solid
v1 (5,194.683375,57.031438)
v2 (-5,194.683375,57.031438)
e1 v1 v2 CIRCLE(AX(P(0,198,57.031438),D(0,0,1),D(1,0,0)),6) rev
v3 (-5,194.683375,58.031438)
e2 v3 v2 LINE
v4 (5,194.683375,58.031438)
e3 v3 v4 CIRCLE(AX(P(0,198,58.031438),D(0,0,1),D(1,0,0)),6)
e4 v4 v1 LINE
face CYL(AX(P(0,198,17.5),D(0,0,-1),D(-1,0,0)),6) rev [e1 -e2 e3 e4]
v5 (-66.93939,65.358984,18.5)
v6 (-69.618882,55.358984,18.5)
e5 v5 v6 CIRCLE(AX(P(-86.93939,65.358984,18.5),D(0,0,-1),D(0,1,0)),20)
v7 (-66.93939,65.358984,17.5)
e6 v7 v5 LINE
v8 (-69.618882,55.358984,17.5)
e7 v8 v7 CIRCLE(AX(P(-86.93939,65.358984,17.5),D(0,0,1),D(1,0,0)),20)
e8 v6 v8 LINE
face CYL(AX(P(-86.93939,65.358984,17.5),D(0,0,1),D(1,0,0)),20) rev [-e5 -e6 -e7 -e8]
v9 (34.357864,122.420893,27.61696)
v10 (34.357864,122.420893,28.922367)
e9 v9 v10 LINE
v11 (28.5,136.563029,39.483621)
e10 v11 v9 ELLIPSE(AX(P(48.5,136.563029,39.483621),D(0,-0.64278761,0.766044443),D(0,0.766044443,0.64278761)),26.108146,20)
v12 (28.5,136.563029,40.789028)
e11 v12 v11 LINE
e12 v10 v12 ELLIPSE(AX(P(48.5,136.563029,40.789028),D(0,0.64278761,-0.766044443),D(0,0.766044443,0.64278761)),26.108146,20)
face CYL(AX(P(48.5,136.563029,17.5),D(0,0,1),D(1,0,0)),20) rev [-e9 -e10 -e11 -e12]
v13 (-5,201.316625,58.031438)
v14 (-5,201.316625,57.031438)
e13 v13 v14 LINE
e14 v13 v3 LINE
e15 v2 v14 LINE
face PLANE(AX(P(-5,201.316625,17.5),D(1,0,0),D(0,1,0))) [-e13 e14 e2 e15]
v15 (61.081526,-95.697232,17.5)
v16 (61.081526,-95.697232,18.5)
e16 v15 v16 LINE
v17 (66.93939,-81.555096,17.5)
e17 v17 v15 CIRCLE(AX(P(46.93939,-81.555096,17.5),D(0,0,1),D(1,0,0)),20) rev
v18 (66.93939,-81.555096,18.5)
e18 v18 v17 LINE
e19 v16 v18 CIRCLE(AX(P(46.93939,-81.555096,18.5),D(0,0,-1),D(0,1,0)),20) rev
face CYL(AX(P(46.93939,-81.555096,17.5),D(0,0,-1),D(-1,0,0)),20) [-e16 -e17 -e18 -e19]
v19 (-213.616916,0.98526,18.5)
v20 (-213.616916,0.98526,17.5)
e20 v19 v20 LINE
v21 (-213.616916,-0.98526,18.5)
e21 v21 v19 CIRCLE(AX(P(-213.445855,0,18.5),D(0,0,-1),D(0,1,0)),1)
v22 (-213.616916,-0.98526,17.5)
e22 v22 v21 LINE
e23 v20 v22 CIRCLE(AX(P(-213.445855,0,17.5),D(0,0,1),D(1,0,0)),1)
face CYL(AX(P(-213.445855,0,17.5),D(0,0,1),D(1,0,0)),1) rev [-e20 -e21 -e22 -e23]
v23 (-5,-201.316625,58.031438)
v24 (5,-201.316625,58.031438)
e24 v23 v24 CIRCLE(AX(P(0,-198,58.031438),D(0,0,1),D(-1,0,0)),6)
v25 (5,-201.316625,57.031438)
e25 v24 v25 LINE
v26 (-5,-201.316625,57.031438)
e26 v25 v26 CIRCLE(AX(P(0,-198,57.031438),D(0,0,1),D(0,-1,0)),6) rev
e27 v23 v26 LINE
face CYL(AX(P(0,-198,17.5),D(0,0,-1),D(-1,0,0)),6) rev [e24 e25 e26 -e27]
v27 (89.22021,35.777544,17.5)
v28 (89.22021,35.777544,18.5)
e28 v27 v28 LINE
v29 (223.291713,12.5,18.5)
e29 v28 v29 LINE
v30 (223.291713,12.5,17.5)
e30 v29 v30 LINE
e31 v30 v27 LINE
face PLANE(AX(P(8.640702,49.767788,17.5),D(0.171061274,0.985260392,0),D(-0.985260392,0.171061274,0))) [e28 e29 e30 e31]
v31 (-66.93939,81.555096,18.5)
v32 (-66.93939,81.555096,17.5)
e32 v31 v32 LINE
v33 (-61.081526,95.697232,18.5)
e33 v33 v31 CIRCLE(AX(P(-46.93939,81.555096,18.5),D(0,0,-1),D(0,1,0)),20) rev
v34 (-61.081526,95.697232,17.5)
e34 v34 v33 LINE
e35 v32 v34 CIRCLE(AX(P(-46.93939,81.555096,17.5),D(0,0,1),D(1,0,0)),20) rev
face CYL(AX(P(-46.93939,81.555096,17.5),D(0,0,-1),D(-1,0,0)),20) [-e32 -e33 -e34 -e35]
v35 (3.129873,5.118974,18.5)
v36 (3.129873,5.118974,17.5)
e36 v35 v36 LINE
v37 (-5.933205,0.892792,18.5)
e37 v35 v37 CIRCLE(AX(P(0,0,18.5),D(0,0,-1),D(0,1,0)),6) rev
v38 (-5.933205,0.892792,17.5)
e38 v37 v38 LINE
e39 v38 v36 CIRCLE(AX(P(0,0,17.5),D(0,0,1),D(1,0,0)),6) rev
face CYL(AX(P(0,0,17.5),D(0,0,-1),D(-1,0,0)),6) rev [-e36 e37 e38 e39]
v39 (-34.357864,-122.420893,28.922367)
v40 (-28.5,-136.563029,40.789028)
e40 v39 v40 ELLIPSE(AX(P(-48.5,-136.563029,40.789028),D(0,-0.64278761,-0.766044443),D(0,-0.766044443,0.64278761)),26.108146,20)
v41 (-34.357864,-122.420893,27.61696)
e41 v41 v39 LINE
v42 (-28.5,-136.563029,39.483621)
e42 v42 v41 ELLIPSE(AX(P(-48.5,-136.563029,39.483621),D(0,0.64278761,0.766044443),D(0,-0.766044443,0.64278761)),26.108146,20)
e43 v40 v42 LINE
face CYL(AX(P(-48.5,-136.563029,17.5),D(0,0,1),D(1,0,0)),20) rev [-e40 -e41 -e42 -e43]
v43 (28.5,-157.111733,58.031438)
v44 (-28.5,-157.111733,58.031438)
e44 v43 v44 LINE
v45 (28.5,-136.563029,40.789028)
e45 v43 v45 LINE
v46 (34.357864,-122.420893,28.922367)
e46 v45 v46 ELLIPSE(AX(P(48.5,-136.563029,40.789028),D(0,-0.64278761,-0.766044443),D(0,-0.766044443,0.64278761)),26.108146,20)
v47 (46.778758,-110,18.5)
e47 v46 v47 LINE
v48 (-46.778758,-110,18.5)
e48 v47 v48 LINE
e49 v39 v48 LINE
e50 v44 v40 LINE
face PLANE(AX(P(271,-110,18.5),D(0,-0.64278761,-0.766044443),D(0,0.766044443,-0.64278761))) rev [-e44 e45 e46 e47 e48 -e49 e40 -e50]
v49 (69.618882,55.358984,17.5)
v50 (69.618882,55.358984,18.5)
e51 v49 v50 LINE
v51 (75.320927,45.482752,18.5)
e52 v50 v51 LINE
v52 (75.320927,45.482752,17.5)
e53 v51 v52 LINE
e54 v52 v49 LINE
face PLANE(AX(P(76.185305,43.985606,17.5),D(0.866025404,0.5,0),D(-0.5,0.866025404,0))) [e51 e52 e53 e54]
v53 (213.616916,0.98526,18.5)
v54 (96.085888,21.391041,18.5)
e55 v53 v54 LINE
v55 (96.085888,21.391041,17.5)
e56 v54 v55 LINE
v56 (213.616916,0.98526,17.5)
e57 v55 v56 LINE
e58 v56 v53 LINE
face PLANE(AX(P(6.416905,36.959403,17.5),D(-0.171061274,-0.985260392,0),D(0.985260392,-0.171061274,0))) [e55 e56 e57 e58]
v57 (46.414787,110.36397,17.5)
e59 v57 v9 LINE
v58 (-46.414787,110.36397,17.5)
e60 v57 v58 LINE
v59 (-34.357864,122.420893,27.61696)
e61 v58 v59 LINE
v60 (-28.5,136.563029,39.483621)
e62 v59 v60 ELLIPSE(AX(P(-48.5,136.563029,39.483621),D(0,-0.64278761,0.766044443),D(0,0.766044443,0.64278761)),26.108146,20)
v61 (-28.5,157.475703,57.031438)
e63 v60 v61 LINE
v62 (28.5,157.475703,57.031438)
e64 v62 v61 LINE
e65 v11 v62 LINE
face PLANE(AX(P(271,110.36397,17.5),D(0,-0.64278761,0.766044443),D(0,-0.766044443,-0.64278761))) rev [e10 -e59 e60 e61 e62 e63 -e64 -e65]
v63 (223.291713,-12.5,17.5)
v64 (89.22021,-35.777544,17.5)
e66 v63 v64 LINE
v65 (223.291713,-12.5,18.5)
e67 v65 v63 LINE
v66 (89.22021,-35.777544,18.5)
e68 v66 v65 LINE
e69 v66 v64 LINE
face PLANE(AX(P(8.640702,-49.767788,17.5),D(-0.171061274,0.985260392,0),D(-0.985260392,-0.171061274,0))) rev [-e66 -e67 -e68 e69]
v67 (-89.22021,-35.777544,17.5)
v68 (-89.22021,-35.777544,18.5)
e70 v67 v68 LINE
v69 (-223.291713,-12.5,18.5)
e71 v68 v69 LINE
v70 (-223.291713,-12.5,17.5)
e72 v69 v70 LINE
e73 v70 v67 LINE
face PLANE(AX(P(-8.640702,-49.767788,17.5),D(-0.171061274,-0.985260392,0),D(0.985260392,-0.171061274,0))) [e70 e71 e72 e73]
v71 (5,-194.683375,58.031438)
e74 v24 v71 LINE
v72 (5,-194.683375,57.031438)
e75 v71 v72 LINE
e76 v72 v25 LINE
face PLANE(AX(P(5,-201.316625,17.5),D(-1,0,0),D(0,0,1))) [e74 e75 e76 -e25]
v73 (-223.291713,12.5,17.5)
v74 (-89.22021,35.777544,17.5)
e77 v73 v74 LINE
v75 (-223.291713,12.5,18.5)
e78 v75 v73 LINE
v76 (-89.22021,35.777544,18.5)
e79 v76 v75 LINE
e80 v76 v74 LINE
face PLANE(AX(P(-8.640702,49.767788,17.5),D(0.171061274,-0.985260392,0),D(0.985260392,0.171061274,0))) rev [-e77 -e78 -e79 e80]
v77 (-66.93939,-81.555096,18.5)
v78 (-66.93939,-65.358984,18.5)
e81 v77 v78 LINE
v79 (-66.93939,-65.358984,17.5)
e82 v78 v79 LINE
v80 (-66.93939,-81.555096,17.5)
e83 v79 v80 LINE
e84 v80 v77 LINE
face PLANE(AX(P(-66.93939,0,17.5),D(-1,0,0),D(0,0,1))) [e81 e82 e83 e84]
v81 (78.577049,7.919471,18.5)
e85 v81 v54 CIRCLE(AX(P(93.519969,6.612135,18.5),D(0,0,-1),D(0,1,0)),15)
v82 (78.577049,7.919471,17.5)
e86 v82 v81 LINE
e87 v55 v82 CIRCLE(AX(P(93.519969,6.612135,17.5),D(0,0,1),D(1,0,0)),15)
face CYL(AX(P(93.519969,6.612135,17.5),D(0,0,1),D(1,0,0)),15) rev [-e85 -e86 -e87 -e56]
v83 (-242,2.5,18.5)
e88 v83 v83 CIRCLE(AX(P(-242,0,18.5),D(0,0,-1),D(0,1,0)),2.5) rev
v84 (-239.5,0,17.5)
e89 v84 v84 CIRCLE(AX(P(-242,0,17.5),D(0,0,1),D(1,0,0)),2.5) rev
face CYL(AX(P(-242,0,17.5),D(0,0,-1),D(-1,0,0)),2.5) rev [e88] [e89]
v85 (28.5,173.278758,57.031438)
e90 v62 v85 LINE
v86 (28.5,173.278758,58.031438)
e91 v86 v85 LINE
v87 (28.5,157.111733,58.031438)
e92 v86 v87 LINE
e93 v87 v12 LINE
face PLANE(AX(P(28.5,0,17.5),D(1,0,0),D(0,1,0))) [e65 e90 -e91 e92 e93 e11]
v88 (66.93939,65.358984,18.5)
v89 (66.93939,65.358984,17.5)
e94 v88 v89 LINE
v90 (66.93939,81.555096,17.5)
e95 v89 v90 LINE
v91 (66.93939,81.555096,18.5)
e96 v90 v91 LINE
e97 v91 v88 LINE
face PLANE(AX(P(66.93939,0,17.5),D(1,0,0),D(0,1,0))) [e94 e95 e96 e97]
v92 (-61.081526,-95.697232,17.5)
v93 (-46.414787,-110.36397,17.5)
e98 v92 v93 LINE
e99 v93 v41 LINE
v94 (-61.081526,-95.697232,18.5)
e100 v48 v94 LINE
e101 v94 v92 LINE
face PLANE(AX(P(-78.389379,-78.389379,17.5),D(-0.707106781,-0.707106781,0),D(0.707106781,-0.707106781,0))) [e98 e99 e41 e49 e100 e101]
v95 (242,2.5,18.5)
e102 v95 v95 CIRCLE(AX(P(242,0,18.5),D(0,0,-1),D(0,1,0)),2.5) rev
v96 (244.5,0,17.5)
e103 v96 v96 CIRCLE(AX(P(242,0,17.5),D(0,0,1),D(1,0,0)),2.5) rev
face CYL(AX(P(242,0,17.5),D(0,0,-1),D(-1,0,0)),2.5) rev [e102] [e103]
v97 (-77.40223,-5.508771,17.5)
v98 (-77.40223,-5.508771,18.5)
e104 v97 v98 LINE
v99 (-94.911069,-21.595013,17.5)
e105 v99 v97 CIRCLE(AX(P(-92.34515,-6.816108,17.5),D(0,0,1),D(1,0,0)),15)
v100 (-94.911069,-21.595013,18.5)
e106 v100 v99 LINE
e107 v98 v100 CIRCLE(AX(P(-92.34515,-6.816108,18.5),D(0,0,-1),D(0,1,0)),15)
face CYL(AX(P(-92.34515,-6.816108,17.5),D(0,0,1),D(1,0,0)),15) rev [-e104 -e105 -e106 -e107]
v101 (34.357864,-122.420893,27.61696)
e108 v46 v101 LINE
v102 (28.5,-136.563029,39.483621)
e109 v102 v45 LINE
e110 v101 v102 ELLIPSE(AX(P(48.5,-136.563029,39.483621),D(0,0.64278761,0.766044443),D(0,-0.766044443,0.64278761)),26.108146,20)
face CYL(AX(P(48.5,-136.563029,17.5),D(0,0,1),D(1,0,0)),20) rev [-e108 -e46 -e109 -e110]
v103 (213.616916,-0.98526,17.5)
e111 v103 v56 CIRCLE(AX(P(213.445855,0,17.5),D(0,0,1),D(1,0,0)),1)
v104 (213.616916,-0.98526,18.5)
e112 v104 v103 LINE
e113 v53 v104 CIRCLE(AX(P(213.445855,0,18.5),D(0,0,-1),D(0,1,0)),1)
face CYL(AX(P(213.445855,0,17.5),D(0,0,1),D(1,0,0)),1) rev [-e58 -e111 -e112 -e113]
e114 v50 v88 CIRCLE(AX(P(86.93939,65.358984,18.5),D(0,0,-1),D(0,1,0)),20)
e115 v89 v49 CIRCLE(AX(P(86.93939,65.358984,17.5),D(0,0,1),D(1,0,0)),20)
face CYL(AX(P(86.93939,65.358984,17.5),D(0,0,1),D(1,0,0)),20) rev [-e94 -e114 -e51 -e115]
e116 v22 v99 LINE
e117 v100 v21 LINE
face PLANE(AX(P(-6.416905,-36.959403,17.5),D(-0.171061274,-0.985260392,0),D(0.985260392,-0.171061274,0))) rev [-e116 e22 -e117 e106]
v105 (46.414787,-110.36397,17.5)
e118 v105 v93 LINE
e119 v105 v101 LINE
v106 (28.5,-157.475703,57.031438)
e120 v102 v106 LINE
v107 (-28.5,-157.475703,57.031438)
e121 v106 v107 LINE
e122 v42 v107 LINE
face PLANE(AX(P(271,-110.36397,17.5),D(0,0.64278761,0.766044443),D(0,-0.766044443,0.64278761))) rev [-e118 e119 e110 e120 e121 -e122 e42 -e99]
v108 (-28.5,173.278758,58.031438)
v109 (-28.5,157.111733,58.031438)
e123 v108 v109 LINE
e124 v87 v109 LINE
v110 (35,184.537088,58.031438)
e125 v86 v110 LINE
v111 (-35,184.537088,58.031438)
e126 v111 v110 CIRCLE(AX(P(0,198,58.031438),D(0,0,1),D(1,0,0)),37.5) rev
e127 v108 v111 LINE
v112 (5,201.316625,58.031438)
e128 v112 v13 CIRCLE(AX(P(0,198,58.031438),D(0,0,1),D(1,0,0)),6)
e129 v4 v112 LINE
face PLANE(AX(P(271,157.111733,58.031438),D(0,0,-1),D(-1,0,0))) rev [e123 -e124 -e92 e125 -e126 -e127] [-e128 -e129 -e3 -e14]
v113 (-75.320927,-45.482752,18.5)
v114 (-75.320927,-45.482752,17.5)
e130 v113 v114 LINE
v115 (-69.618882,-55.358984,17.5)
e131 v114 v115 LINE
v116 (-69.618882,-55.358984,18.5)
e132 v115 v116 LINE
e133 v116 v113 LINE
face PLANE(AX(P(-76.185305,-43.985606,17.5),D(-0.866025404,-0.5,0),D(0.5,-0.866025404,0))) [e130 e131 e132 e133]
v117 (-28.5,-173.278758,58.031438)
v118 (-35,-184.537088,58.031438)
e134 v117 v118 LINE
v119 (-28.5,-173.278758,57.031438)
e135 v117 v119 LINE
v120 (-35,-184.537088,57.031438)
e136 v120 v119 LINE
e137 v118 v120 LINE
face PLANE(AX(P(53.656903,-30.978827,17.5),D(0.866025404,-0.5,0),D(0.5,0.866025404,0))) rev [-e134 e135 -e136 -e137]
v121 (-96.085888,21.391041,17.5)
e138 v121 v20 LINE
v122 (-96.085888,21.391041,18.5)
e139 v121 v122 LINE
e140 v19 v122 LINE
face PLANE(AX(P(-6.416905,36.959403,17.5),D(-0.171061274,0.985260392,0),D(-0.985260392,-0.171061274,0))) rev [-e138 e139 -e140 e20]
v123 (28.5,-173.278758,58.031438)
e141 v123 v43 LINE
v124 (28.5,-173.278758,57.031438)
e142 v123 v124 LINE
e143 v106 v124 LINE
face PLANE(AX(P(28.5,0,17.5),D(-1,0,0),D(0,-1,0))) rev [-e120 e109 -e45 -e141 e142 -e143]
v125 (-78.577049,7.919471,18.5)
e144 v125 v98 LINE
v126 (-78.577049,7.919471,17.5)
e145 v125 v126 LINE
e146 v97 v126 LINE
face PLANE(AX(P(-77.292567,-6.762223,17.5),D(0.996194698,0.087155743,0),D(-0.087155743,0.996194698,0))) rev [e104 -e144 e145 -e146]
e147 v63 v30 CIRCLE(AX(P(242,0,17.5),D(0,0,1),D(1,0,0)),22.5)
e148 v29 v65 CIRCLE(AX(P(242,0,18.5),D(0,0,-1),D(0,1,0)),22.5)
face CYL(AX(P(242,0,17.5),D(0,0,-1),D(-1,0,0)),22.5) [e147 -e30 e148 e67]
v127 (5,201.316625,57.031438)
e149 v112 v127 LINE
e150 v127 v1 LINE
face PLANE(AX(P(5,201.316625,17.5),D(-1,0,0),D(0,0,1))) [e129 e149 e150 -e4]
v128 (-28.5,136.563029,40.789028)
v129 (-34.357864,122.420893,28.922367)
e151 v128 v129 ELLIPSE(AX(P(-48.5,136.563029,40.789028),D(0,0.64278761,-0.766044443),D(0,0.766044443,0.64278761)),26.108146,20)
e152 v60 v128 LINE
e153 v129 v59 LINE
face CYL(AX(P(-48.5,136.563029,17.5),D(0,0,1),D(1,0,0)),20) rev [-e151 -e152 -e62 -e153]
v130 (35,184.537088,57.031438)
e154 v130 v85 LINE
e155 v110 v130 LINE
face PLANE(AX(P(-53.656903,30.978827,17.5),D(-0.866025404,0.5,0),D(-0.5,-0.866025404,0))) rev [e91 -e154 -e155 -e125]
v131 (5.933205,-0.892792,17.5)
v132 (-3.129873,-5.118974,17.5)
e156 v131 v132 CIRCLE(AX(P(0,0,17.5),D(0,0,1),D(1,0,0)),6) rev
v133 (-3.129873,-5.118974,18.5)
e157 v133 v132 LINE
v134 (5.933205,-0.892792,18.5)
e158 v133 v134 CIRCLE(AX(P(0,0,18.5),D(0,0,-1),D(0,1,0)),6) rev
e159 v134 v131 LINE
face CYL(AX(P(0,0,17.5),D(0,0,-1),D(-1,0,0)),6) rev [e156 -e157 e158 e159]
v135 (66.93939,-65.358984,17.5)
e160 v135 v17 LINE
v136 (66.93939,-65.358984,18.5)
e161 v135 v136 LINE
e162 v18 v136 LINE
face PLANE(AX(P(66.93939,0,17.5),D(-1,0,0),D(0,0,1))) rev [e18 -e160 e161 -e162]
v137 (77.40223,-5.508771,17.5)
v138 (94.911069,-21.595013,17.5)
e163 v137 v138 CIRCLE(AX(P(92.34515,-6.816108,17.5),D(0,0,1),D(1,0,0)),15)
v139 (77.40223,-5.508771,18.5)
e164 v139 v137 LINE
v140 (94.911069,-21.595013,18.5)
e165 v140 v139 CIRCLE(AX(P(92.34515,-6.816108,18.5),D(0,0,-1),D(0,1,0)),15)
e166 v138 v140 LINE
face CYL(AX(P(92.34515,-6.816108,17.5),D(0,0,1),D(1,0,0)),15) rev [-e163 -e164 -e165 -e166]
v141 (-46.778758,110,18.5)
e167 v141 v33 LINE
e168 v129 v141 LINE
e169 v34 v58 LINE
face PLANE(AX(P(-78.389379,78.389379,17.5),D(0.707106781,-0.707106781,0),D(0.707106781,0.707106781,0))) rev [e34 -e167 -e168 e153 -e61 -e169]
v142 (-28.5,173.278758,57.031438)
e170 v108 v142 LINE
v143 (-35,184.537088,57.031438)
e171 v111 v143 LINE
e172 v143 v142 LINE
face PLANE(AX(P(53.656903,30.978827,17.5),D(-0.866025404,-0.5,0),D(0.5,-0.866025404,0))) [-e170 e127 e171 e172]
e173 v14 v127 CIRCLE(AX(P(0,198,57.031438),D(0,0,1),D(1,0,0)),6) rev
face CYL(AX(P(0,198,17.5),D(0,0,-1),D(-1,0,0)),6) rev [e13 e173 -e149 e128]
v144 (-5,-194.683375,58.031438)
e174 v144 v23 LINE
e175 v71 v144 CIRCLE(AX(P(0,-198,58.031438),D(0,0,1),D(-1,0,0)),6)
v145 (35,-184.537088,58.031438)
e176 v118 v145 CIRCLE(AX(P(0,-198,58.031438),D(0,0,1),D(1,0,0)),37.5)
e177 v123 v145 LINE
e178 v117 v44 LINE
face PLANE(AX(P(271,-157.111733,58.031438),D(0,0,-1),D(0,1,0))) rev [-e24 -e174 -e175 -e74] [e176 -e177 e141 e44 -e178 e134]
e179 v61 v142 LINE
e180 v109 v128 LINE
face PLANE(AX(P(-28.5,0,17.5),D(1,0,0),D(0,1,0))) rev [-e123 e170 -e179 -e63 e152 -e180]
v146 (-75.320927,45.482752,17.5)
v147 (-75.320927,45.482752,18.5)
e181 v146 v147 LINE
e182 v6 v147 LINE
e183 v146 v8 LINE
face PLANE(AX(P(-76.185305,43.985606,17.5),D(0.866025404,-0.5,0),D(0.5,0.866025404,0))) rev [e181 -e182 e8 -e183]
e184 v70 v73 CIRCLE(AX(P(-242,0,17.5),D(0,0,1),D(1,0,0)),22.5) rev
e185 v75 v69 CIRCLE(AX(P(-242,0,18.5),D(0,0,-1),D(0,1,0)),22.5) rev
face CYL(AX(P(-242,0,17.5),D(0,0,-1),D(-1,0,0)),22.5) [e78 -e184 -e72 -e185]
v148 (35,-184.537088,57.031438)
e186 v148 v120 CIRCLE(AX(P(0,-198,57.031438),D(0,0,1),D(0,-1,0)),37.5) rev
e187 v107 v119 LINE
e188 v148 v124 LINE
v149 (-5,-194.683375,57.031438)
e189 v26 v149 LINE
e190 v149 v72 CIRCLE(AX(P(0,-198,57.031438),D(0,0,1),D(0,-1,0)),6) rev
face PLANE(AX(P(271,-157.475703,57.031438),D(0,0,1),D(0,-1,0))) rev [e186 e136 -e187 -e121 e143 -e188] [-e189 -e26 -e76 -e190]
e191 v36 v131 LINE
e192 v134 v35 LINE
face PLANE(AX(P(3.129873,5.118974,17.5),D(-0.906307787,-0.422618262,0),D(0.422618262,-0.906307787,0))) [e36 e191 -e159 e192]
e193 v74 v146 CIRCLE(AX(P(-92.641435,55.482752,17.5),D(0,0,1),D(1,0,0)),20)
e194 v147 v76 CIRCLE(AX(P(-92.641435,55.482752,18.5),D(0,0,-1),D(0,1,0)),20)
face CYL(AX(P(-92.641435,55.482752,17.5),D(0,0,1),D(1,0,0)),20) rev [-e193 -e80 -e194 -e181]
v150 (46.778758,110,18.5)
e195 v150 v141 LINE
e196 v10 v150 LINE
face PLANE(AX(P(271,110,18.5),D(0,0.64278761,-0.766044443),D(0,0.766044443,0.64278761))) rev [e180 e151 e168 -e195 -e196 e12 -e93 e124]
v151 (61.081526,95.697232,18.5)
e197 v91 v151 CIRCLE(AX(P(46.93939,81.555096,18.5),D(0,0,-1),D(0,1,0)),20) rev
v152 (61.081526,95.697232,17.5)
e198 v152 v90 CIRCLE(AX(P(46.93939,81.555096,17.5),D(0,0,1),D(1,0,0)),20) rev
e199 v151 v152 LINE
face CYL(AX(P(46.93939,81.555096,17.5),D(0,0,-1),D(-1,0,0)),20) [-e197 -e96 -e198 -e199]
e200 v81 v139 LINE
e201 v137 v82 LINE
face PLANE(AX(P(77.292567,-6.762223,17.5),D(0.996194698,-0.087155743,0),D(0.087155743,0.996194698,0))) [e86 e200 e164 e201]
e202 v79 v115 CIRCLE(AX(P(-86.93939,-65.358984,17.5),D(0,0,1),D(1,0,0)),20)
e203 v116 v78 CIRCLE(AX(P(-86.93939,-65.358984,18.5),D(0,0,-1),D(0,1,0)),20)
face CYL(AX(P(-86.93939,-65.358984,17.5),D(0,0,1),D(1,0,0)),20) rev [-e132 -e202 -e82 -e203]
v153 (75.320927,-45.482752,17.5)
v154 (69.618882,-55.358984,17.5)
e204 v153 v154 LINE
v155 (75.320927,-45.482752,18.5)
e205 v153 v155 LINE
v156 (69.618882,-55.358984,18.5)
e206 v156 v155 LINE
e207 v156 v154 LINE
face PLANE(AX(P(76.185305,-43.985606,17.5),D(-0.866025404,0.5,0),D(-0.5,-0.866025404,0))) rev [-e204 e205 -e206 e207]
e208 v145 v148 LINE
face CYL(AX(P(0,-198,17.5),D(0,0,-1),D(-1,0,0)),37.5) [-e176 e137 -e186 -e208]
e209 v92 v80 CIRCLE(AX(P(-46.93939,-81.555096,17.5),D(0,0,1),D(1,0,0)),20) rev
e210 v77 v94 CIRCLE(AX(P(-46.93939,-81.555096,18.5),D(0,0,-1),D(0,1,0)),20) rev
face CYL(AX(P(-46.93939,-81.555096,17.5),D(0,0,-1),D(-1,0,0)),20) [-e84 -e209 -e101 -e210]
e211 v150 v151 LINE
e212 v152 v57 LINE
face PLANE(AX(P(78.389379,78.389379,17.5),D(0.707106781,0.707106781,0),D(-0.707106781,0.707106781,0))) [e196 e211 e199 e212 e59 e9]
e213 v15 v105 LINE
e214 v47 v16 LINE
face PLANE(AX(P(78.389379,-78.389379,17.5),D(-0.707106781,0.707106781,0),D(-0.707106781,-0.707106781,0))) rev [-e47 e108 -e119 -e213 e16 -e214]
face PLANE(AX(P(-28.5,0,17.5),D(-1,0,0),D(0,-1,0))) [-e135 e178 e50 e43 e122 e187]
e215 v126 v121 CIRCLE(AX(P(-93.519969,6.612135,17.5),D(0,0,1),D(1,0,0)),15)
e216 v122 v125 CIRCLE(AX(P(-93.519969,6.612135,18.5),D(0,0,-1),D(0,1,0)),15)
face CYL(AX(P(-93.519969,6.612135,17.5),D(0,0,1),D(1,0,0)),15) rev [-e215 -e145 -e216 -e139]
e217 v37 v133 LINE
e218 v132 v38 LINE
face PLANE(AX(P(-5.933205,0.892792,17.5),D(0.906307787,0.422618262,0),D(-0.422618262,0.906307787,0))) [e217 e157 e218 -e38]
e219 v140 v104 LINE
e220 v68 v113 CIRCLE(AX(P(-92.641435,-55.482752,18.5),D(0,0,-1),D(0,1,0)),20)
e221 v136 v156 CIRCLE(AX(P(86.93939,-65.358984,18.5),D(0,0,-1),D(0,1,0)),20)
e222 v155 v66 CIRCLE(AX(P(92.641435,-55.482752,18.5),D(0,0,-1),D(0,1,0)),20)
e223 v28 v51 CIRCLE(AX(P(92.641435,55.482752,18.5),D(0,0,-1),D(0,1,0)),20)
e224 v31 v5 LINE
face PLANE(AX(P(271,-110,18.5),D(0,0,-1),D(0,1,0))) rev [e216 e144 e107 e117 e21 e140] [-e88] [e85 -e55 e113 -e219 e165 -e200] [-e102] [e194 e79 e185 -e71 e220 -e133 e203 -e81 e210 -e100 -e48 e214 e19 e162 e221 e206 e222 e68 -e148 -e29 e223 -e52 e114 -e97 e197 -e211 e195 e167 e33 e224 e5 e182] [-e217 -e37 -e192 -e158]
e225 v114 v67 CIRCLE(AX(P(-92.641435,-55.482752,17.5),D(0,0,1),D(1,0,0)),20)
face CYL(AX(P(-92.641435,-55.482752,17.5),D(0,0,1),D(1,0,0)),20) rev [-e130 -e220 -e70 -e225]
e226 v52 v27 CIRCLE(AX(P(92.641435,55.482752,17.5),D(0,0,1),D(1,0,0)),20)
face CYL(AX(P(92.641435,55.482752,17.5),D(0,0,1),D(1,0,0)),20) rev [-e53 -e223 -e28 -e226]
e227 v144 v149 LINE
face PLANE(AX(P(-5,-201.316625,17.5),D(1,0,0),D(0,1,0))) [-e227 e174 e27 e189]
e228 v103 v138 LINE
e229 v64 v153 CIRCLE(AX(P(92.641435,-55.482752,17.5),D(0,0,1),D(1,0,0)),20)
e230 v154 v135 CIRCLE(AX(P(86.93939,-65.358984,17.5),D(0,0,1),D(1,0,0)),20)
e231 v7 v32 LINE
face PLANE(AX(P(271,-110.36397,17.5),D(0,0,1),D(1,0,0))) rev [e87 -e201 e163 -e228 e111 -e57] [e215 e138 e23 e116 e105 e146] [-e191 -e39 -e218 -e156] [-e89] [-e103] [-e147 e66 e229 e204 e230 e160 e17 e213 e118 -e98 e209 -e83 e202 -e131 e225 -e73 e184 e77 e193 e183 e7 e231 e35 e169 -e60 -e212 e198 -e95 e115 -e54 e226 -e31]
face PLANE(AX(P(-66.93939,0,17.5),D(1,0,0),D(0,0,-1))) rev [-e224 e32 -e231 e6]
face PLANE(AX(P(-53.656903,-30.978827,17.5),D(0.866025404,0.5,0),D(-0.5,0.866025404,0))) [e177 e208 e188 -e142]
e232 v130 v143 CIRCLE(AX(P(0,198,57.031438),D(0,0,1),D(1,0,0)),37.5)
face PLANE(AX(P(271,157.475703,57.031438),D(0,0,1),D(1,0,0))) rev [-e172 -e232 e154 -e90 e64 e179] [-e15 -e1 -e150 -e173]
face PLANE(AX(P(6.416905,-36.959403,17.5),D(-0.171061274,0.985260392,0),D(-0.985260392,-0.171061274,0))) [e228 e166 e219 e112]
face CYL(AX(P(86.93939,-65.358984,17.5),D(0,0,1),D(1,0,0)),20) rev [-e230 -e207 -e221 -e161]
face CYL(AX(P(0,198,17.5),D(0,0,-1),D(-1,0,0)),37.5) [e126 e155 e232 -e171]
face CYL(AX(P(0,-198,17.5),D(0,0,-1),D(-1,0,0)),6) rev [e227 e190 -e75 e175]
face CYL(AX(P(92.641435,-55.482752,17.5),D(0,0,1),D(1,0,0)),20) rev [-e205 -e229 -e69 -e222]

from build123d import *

# Parameters (mm, degrees)
SALIENTE_EXTRUIR1_DEPTH     = 271
CORTAR_EXTRUIR9_DEPTH       = 372.904084134
CORTAR_EXTRUIR9_DEPTH_BACK  = 372.904084134
CROQUIS4_R                  = 2.5
CORTAR_EXTRUIR10_DEPTH      = 372.904084134
CORTAR_EXTRUIR10_DEPTH_BACK = 372.904084134
CROQUIS2_W                  = 581.580028242
CROQUIS2_H                  = 554.061756016
REDONDEO1_R                 = 20
REDONDEO2_R                 = 15
REDONDEO3_R                 = 1


with BuildPart() as part:
    # Croquis1 → Saliente-Extruir1 (new, symmetric)
    with BuildSketch(Plane(origin=(0, 0, 0), x_dir=(0, 0, -1), z_dir=(1, 0, 0))):
        Polygon((-18.5, -110), (-18.5, 110), (-58.031437996, 157.111733252), (-58.031437996, 248), (-57.031437996, 248), (-57.031437996, 157.475703486), (-17.5, 110.363970234), (-17.5, -110.363970234), (-57.031437996, -157.475703486), (-57.031437996, -248), (-58.031437996, -248), (-58.031437996, -157.111733252), align=None)
    extrude(amount=SALIENTE_EXTRUIR1_DEPTH, both=True)

    # Croquis4 → Cortar-Extruir9 (cut, two sides: drawn at the far end of the back side and taken through both)
    with BuildSketch(Plane.XY.offset(-CORTAR_EXTRUIR9_DEPTH_BACK)):
        with Locations(Location((-242, 0, 0), (0, 0, 90))):
            Circle(CROQUIS4_R)
        with Locations(Location((242, 0, 0), (0, 0, 90))):
            Circle(CROQUIS4_R)
        with BuildLine():
            Line((-5, 201.31662479), (-5, 194.68337521))
            ThreePointArc((-5, 194.68337521), (0, 192), (5, 194.68337521))
            Line((5, 194.68337521), (5, 201.31662479))
            ThreePointArc((5, 201.31662479), (0, 204), (-5, 201.31662479))
        make_face()
        with BuildLine():
            Line((5, -201.31662479), (5, -194.68337521))
            ThreePointArc((5, -194.68337521), (0, -192), (-5, -194.68337521))
            Line((-5, -194.68337521), (-5, -201.31662479))
            ThreePointArc((-5, -201.31662479), (0, -204), (5, -201.31662479))
        make_face()
        with BuildLine():
            Line((-5.933205139, 0.892791565), (-3.129872731, -5.118974183))
            ThreePointArc((-3.129872731, -5.118974183), (2.53570957, -5.437846722), (5.933205139, -0.892791565))
            Line((5.933205139, -0.892791565), (3.129872731, 5.118974183))
            ThreePointArc((3.129872731, 5.118974183), (-2.53570957, 5.437846722), (-5.933205139, 0.892791565))
        make_face()
    extrude(amount=CORTAR_EXTRUIR9_DEPTH + CORTAR_EXTRUIR9_DEPTH_BACK, mode=Mode.SUBTRACT)

    # Croquis2 → Cortar-Extruir10 (cut, two sides: drawn at the far end of the back side and taken through both)
    # profile 1 of 3: a face of its own
    with BuildSketch(Plane.XY.offset(-CORTAR_EXTRUIR10_DEPTH_BACK)):
        Rectangle(CROQUIS2_W, CROQUIS2_H)
        with BuildLine():
            Line((80, 37.378360334), (223.291713066, 12.5))
            ThreePointArc((223.291713066, 12.5), (264.5, 0), (223.291713066, -12.5))
            Line((223.291713066, -12.5), (80, -37.378360334))
            Line((80, -37.378360334), (66.939390249, -60))
            Line((66.939390249, -60), (66.939390249, -89.839367484))
            Line((66.939390249, -89.839367484), (28.5, -128.278757733))
            Line((28.5, -128.278757733), (28.5, -173.278757733))
            Line((28.5, -173.278757733), (35, -184.537087982))
            ThreePointArc((35, -184.537087982), (0, -235.5), (-35, -184.537087982))
            Line((-35, -184.537087982), (-28.5, -173.278757733))
            Line((-28.5, -173.278757733), (-28.5, -128.278757733))
            Line((-28.5, -128.278757733), (-66.939390249, -89.839367484))
            Line((-66.939390249, -89.839367484), (-66.939390249, -60))
            Line((-66.939390249, -60), (-80, -37.378360334))
            Line((-80, -37.378360334), (-223.291713066, -12.5))
            ThreePointArc((-223.291713066, -12.5), (-264.5, 0), (-223.291713066, 12.5))
            Line((-223.291713066, 12.5), (-80, 37.378360334))
            Line((-80, 37.378360334), (-66.939390249, 60))
            Line((-66.939390249, 60), (-66.939390249, 89.839367484))
            Line((-66.939390249, 89.839367484), (-28.5, 128.278757733))
            Line((-28.5, 128.278757733), (-28.5, 173.278757733))
            Line((-28.5, 173.278757733), (-35, 184.537087982))
            ThreePointArc((-35, 184.537087982), (0, 235.5), (35, 184.537087982))
            Line((35, 184.537087982), (28.5, 173.278757733))
            Line((28.5, 173.278757733), (28.5, 128.278757733))
            Line((28.5, 128.278757733), (66.939390249, 89.839367484))
            Line((66.939390249, 89.839367484), (66.939390249, 60))
            Line((66.939390249, 60), (80, 37.378360334))
        make_face(mode=Mode.SUBTRACT)
    # profile 2 of 3: a face of its own
    with BuildSketch(Plane.XY.offset(-CORTAR_EXTRUIR10_DEPTH_BACK)):
        Polygon((-75.703100415, -24.92990815), (-80, -24.183878851), (-219.291713066, 0), (-80, 24.183878851), align=None)
    # profile 3 of 3: a face of its own
    with BuildSketch(Plane.XY.offset(-CORTAR_EXTRUIR10_DEPTH_BACK)):
        Polygon((80, 24.183878851), (75.703100415, -24.92990815), (80, -24.183878851), (219.291713066, 0), align=None)
    extrude(amount=CORTAR_EXTRUIR10_DEPTH + CORTAR_EXTRUIR10_DEPTH_BACK, mode=Mode.SUBTRACT)

    # Redondeo1
    # the kernel refuses this fillet: 20 mm, written as the material it adds along each edge
    with BuildSketch(Plane(origin=(-28.5, 128.278757733, 54.548376991), x_dir=(-0.7071067811865487, -0.7071067811865461, 0), z_dir=(0, 0, -1))) as redondeo1_piece_1_section:
        with BuildLine():
            CenterArc((REDONDEO1_R * 0.414213562373, REDONDEO1_R), REDONDEO1_R, 225, 45)
            Line((-REDONDEO1_R * 0.292893218813, REDONDEO1_R * 0.292893218813), (0, 0))
            Line((0, 0), (REDONDEO1_R * 0.414213562373, 0))
        make_face()
    redondeo1_piece_1 = extrude(amount=42.726763527, mode=Mode.PRIVATE)
    redondeo1_piece_1 = split(redondeo1_piece_1, bisect_by=Plane(origin=(-29.703304355, 128.455788912, 33.986245669), z_dir=(0, 0.6427876096865383, -0.7660444431189789)), keep=Keep.TOP, mode=Mode.PRIVATE)
    redondeo1_piece_1 = split(redondeo1_piece_1, bisect_by=Plane(origin=(-29.703304355, 129.098576521, 33.220201226), z_dir=(0, -0.6427876096865383, 0.766044443118979)), keep=Keep.TOP, mode=Mode.PRIVATE)
    add(redondeo1_piece_1)
    with BuildSketch(Plane(origin=(80, 37.378360334, 18.5), x_dir=(0.9852603921679417, -0.17106127447518257, 0), z_dir=(0, 0, -1)), Plane(origin=(80, -37.378360334, 18.5), x_dir=(-0.5000000000000011, -0.8660254037844379, 0), z_dir=(0, 0, -1)), Plane(origin=(-80, -37.378360334, 18.5), x_dir=(-0.9852603921679428, 0.17106127447517586, 0), z_dir=(0, 0, -1)), Plane(origin=(-80, 37.378360334, 18.5), x_dir=(0.5000000000000069, 0.8660254037844347, 0), z_dir=(0, 0, -1))) as redondeo1_piece_2:
        with BuildLine():
            CenterArc((REDONDEO1_R * 0.467907265941, -REDONDEO1_R), REDONDEO1_R, 90, 50.15047048)
            Line((-REDONDEO1_R * 0.299822625782, -REDONDEO1_R * 0.359226394617), (0, 0))
            Line((0, 0), (REDONDEO1_R * 0.467907265941, 0))
        make_face()
    extrude(amount=1)
    with BuildSketch(Plane(origin=(66.939390249, -60, 18.5), x_dir=(0, -1, 0), z_dir=(0, 0, -1)), Plane(origin=(-66.939390249, -60, 18.5), x_dir=(-0.5000000000000052, 0.8660254037844356, 0), z_dir=(0, 0, -1)), Plane(origin=(-66.939390249, 60, 18.5), x_dir=(0, 1, 0), z_dir=(0, 0, -1)), Plane(origin=(66.939390249, 60, 18.5), x_dir=(0.5000000000000032, -0.8660254037844367, 0), z_dir=(0, 0, -1))) as redondeo1_piece_3:
        with BuildLine():
            CenterArc((REDONDEO1_R * 0.267949192431, -REDONDEO1_R), REDONDEO1_R, 90, 30)
            Line((-REDONDEO1_R * 0.232050807569, -REDONDEO1_R * 0.133974596216), (0, 0))
            Line((0, 0), (REDONDEO1_R * 0.267949192431, 0))
        make_face()
    extrude(amount=1)
    with BuildSketch(Plane(origin=(28.5, 128.278757733, 54.548376991), x_dir=(0.7071067811865498, -0.7071067811865451, 0), z_dir=(0, 0, -1))) as redondeo1_piece_4_section:
        with BuildLine():
            CenterArc((REDONDEO1_R * 0.414213562373, -REDONDEO1_R), REDONDEO1_R, 90, 45)
            Line((-REDONDEO1_R * 0.292893218813, -REDONDEO1_R * 0.292893218813), (0, 0))
            Line((0, 0), (REDONDEO1_R * 0.414213562373, 0))
        make_face()
    redondeo1_piece_4 = extrude(amount=42.726763527, mode=Mode.PRIVATE)
    redondeo1_piece_4 = split(redondeo1_piece_4, bisect_by=Plane(origin=(29.703304355, 128.455788912, 33.986245669), z_dir=(0, 0.6427876096865383, -0.7660444431189789)), keep=Keep.TOP, mode=Mode.PRIVATE)
    redondeo1_piece_4 = split(redondeo1_piece_4, bisect_by=Plane(origin=(29.703304355, 129.098576521, 33.220201226), z_dir=(0, -0.6427876096865383, 0.766044443118979)), keep=Keep.TOP, mode=Mode.PRIVATE)
    add(redondeo1_piece_4)
    with BuildSketch(Plane(origin=(28.5, -128.278757733, 54.548376991), x_dir=(0.7071067811865518, 0.7071067811865431, 0), z_dir=(0, 0, -1))) as redondeo1_piece_5_section:
        with BuildLine():
            CenterArc((REDONDEO1_R * 0.414213562373, REDONDEO1_R), REDONDEO1_R, 225, 45)
            Line((-REDONDEO1_R * 0.292893218813, REDONDEO1_R * 0.292893218813), (0, 0))
            Line((0, 0), (REDONDEO1_R * 0.414213562373, 0))
        make_face()
    redondeo1_piece_5 = extrude(amount=42.726763527, mode=Mode.PRIVATE)
    redondeo1_piece_5 = split(redondeo1_piece_5, bisect_by=Plane(origin=(29.703304355, -128.455788912, 33.986245669), z_dir=(0, -0.6427876096865381, -0.766044443118979)), keep=Keep.TOP, mode=Mode.PRIVATE)
    redondeo1_piece_5 = split(redondeo1_piece_5, bisect_by=Plane(origin=(29.703304355, -129.098576521, 33.220201226), z_dir=(0, 0.6427876096865377, 0.7660444431189795)), keep=Keep.TOP, mode=Mode.PRIVATE)
    add(redondeo1_piece_5)
    with BuildSketch(Plane(origin=(-28.5, -128.278757733, 54.548376991), x_dir=(-0.7071067811865503, 0.7071067811865448, 0), z_dir=(0, 0, -1))) as redondeo1_piece_6_section:
        with BuildLine():
            CenterArc((REDONDEO1_R * 0.414213562373, -REDONDEO1_R), REDONDEO1_R, 90, 45)
            Line((-REDONDEO1_R * 0.292893218813, -REDONDEO1_R * 0.292893218813), (0, 0))
            Line((0, 0), (REDONDEO1_R * 0.414213562373, 0))
        make_face()
    redondeo1_piece_6 = extrude(amount=42.726763527, mode=Mode.PRIVATE)
    redondeo1_piece_6 = split(redondeo1_piece_6, bisect_by=Plane(origin=(-29.703304355, -128.455788912, 33.986245669), z_dir=(0, -0.6427876096865381, -0.766044443118979)), keep=Keep.TOP, mode=Mode.PRIVATE)
    redondeo1_piece_6 = split(redondeo1_piece_6, bisect_by=Plane(origin=(-29.703304355, -129.098576521, 33.220201226), z_dir=(0, 0.6427876096865377, 0.7660444431189795)), keep=Keep.TOP, mode=Mode.PRIVATE)
    add(redondeo1_piece_6)
    # the kernel refuses this fillet: 20 mm, written as the material it takes off along each edge
    with BuildSketch(Plane(origin=(-66.939390249, -89.839367484, 39.210678119), x_dir=(0, 1, 0), z_dir=(0, 0, -1)), Plane(origin=(-66.939390249, 89.839367484, 39.210678119), x_dir=(0.7071067811865483, 0.7071067811865467, 0), z_dir=(0, 0, -1)), Plane(origin=(66.939390249, 89.839367484, 39.210678119), x_dir=(0, -1, 0), z_dir=(0, 0, -1)), Plane(origin=(66.939390249, -89.839367484, 39.210678119), x_dir=(-0.7071067811865501, -0.707106781186545, 0), z_dir=(0, 0, -1))) as redondeo1_2_piece_1:
        with BuildLine():
            CenterArc((REDONDEO1_R * 0.414213562373, REDONDEO1_R), REDONDEO1_R, 225, 45)
            Line((-REDONDEO1_R * 0.292893218813, REDONDEO1_R * 0.292893218813), (0, 0))
            Line((0, 0), (REDONDEO1_R * 0.414213562373, 0))
        make_face()
    extrude(amount=42.421356237, mode=Mode.SUBTRACT)

    # Redondeo2
    redondeo2_edges = [part.edges().sort_by_distance(p)[0] for p in [
        (80, 24.183878851, 18),
        (75.703100415, -24.92990815, 18),
        (-75.703100415, -24.92990815, 18),
        (-80, 24.183878851, 18),
    ]]
    fillet(redondeo2_edges, radius=REDONDEO2_R)

    # Redondeo3
    redondeo3_edges = [part.edges().sort_by_distance(p)[0] for p in [
        (219.291713066, 0, 18),
        (-219.291713066, 0, 18),
    ]]
    fillet(redondeo3_edges, radius=REDONDEO3_R)


solid = part.part
